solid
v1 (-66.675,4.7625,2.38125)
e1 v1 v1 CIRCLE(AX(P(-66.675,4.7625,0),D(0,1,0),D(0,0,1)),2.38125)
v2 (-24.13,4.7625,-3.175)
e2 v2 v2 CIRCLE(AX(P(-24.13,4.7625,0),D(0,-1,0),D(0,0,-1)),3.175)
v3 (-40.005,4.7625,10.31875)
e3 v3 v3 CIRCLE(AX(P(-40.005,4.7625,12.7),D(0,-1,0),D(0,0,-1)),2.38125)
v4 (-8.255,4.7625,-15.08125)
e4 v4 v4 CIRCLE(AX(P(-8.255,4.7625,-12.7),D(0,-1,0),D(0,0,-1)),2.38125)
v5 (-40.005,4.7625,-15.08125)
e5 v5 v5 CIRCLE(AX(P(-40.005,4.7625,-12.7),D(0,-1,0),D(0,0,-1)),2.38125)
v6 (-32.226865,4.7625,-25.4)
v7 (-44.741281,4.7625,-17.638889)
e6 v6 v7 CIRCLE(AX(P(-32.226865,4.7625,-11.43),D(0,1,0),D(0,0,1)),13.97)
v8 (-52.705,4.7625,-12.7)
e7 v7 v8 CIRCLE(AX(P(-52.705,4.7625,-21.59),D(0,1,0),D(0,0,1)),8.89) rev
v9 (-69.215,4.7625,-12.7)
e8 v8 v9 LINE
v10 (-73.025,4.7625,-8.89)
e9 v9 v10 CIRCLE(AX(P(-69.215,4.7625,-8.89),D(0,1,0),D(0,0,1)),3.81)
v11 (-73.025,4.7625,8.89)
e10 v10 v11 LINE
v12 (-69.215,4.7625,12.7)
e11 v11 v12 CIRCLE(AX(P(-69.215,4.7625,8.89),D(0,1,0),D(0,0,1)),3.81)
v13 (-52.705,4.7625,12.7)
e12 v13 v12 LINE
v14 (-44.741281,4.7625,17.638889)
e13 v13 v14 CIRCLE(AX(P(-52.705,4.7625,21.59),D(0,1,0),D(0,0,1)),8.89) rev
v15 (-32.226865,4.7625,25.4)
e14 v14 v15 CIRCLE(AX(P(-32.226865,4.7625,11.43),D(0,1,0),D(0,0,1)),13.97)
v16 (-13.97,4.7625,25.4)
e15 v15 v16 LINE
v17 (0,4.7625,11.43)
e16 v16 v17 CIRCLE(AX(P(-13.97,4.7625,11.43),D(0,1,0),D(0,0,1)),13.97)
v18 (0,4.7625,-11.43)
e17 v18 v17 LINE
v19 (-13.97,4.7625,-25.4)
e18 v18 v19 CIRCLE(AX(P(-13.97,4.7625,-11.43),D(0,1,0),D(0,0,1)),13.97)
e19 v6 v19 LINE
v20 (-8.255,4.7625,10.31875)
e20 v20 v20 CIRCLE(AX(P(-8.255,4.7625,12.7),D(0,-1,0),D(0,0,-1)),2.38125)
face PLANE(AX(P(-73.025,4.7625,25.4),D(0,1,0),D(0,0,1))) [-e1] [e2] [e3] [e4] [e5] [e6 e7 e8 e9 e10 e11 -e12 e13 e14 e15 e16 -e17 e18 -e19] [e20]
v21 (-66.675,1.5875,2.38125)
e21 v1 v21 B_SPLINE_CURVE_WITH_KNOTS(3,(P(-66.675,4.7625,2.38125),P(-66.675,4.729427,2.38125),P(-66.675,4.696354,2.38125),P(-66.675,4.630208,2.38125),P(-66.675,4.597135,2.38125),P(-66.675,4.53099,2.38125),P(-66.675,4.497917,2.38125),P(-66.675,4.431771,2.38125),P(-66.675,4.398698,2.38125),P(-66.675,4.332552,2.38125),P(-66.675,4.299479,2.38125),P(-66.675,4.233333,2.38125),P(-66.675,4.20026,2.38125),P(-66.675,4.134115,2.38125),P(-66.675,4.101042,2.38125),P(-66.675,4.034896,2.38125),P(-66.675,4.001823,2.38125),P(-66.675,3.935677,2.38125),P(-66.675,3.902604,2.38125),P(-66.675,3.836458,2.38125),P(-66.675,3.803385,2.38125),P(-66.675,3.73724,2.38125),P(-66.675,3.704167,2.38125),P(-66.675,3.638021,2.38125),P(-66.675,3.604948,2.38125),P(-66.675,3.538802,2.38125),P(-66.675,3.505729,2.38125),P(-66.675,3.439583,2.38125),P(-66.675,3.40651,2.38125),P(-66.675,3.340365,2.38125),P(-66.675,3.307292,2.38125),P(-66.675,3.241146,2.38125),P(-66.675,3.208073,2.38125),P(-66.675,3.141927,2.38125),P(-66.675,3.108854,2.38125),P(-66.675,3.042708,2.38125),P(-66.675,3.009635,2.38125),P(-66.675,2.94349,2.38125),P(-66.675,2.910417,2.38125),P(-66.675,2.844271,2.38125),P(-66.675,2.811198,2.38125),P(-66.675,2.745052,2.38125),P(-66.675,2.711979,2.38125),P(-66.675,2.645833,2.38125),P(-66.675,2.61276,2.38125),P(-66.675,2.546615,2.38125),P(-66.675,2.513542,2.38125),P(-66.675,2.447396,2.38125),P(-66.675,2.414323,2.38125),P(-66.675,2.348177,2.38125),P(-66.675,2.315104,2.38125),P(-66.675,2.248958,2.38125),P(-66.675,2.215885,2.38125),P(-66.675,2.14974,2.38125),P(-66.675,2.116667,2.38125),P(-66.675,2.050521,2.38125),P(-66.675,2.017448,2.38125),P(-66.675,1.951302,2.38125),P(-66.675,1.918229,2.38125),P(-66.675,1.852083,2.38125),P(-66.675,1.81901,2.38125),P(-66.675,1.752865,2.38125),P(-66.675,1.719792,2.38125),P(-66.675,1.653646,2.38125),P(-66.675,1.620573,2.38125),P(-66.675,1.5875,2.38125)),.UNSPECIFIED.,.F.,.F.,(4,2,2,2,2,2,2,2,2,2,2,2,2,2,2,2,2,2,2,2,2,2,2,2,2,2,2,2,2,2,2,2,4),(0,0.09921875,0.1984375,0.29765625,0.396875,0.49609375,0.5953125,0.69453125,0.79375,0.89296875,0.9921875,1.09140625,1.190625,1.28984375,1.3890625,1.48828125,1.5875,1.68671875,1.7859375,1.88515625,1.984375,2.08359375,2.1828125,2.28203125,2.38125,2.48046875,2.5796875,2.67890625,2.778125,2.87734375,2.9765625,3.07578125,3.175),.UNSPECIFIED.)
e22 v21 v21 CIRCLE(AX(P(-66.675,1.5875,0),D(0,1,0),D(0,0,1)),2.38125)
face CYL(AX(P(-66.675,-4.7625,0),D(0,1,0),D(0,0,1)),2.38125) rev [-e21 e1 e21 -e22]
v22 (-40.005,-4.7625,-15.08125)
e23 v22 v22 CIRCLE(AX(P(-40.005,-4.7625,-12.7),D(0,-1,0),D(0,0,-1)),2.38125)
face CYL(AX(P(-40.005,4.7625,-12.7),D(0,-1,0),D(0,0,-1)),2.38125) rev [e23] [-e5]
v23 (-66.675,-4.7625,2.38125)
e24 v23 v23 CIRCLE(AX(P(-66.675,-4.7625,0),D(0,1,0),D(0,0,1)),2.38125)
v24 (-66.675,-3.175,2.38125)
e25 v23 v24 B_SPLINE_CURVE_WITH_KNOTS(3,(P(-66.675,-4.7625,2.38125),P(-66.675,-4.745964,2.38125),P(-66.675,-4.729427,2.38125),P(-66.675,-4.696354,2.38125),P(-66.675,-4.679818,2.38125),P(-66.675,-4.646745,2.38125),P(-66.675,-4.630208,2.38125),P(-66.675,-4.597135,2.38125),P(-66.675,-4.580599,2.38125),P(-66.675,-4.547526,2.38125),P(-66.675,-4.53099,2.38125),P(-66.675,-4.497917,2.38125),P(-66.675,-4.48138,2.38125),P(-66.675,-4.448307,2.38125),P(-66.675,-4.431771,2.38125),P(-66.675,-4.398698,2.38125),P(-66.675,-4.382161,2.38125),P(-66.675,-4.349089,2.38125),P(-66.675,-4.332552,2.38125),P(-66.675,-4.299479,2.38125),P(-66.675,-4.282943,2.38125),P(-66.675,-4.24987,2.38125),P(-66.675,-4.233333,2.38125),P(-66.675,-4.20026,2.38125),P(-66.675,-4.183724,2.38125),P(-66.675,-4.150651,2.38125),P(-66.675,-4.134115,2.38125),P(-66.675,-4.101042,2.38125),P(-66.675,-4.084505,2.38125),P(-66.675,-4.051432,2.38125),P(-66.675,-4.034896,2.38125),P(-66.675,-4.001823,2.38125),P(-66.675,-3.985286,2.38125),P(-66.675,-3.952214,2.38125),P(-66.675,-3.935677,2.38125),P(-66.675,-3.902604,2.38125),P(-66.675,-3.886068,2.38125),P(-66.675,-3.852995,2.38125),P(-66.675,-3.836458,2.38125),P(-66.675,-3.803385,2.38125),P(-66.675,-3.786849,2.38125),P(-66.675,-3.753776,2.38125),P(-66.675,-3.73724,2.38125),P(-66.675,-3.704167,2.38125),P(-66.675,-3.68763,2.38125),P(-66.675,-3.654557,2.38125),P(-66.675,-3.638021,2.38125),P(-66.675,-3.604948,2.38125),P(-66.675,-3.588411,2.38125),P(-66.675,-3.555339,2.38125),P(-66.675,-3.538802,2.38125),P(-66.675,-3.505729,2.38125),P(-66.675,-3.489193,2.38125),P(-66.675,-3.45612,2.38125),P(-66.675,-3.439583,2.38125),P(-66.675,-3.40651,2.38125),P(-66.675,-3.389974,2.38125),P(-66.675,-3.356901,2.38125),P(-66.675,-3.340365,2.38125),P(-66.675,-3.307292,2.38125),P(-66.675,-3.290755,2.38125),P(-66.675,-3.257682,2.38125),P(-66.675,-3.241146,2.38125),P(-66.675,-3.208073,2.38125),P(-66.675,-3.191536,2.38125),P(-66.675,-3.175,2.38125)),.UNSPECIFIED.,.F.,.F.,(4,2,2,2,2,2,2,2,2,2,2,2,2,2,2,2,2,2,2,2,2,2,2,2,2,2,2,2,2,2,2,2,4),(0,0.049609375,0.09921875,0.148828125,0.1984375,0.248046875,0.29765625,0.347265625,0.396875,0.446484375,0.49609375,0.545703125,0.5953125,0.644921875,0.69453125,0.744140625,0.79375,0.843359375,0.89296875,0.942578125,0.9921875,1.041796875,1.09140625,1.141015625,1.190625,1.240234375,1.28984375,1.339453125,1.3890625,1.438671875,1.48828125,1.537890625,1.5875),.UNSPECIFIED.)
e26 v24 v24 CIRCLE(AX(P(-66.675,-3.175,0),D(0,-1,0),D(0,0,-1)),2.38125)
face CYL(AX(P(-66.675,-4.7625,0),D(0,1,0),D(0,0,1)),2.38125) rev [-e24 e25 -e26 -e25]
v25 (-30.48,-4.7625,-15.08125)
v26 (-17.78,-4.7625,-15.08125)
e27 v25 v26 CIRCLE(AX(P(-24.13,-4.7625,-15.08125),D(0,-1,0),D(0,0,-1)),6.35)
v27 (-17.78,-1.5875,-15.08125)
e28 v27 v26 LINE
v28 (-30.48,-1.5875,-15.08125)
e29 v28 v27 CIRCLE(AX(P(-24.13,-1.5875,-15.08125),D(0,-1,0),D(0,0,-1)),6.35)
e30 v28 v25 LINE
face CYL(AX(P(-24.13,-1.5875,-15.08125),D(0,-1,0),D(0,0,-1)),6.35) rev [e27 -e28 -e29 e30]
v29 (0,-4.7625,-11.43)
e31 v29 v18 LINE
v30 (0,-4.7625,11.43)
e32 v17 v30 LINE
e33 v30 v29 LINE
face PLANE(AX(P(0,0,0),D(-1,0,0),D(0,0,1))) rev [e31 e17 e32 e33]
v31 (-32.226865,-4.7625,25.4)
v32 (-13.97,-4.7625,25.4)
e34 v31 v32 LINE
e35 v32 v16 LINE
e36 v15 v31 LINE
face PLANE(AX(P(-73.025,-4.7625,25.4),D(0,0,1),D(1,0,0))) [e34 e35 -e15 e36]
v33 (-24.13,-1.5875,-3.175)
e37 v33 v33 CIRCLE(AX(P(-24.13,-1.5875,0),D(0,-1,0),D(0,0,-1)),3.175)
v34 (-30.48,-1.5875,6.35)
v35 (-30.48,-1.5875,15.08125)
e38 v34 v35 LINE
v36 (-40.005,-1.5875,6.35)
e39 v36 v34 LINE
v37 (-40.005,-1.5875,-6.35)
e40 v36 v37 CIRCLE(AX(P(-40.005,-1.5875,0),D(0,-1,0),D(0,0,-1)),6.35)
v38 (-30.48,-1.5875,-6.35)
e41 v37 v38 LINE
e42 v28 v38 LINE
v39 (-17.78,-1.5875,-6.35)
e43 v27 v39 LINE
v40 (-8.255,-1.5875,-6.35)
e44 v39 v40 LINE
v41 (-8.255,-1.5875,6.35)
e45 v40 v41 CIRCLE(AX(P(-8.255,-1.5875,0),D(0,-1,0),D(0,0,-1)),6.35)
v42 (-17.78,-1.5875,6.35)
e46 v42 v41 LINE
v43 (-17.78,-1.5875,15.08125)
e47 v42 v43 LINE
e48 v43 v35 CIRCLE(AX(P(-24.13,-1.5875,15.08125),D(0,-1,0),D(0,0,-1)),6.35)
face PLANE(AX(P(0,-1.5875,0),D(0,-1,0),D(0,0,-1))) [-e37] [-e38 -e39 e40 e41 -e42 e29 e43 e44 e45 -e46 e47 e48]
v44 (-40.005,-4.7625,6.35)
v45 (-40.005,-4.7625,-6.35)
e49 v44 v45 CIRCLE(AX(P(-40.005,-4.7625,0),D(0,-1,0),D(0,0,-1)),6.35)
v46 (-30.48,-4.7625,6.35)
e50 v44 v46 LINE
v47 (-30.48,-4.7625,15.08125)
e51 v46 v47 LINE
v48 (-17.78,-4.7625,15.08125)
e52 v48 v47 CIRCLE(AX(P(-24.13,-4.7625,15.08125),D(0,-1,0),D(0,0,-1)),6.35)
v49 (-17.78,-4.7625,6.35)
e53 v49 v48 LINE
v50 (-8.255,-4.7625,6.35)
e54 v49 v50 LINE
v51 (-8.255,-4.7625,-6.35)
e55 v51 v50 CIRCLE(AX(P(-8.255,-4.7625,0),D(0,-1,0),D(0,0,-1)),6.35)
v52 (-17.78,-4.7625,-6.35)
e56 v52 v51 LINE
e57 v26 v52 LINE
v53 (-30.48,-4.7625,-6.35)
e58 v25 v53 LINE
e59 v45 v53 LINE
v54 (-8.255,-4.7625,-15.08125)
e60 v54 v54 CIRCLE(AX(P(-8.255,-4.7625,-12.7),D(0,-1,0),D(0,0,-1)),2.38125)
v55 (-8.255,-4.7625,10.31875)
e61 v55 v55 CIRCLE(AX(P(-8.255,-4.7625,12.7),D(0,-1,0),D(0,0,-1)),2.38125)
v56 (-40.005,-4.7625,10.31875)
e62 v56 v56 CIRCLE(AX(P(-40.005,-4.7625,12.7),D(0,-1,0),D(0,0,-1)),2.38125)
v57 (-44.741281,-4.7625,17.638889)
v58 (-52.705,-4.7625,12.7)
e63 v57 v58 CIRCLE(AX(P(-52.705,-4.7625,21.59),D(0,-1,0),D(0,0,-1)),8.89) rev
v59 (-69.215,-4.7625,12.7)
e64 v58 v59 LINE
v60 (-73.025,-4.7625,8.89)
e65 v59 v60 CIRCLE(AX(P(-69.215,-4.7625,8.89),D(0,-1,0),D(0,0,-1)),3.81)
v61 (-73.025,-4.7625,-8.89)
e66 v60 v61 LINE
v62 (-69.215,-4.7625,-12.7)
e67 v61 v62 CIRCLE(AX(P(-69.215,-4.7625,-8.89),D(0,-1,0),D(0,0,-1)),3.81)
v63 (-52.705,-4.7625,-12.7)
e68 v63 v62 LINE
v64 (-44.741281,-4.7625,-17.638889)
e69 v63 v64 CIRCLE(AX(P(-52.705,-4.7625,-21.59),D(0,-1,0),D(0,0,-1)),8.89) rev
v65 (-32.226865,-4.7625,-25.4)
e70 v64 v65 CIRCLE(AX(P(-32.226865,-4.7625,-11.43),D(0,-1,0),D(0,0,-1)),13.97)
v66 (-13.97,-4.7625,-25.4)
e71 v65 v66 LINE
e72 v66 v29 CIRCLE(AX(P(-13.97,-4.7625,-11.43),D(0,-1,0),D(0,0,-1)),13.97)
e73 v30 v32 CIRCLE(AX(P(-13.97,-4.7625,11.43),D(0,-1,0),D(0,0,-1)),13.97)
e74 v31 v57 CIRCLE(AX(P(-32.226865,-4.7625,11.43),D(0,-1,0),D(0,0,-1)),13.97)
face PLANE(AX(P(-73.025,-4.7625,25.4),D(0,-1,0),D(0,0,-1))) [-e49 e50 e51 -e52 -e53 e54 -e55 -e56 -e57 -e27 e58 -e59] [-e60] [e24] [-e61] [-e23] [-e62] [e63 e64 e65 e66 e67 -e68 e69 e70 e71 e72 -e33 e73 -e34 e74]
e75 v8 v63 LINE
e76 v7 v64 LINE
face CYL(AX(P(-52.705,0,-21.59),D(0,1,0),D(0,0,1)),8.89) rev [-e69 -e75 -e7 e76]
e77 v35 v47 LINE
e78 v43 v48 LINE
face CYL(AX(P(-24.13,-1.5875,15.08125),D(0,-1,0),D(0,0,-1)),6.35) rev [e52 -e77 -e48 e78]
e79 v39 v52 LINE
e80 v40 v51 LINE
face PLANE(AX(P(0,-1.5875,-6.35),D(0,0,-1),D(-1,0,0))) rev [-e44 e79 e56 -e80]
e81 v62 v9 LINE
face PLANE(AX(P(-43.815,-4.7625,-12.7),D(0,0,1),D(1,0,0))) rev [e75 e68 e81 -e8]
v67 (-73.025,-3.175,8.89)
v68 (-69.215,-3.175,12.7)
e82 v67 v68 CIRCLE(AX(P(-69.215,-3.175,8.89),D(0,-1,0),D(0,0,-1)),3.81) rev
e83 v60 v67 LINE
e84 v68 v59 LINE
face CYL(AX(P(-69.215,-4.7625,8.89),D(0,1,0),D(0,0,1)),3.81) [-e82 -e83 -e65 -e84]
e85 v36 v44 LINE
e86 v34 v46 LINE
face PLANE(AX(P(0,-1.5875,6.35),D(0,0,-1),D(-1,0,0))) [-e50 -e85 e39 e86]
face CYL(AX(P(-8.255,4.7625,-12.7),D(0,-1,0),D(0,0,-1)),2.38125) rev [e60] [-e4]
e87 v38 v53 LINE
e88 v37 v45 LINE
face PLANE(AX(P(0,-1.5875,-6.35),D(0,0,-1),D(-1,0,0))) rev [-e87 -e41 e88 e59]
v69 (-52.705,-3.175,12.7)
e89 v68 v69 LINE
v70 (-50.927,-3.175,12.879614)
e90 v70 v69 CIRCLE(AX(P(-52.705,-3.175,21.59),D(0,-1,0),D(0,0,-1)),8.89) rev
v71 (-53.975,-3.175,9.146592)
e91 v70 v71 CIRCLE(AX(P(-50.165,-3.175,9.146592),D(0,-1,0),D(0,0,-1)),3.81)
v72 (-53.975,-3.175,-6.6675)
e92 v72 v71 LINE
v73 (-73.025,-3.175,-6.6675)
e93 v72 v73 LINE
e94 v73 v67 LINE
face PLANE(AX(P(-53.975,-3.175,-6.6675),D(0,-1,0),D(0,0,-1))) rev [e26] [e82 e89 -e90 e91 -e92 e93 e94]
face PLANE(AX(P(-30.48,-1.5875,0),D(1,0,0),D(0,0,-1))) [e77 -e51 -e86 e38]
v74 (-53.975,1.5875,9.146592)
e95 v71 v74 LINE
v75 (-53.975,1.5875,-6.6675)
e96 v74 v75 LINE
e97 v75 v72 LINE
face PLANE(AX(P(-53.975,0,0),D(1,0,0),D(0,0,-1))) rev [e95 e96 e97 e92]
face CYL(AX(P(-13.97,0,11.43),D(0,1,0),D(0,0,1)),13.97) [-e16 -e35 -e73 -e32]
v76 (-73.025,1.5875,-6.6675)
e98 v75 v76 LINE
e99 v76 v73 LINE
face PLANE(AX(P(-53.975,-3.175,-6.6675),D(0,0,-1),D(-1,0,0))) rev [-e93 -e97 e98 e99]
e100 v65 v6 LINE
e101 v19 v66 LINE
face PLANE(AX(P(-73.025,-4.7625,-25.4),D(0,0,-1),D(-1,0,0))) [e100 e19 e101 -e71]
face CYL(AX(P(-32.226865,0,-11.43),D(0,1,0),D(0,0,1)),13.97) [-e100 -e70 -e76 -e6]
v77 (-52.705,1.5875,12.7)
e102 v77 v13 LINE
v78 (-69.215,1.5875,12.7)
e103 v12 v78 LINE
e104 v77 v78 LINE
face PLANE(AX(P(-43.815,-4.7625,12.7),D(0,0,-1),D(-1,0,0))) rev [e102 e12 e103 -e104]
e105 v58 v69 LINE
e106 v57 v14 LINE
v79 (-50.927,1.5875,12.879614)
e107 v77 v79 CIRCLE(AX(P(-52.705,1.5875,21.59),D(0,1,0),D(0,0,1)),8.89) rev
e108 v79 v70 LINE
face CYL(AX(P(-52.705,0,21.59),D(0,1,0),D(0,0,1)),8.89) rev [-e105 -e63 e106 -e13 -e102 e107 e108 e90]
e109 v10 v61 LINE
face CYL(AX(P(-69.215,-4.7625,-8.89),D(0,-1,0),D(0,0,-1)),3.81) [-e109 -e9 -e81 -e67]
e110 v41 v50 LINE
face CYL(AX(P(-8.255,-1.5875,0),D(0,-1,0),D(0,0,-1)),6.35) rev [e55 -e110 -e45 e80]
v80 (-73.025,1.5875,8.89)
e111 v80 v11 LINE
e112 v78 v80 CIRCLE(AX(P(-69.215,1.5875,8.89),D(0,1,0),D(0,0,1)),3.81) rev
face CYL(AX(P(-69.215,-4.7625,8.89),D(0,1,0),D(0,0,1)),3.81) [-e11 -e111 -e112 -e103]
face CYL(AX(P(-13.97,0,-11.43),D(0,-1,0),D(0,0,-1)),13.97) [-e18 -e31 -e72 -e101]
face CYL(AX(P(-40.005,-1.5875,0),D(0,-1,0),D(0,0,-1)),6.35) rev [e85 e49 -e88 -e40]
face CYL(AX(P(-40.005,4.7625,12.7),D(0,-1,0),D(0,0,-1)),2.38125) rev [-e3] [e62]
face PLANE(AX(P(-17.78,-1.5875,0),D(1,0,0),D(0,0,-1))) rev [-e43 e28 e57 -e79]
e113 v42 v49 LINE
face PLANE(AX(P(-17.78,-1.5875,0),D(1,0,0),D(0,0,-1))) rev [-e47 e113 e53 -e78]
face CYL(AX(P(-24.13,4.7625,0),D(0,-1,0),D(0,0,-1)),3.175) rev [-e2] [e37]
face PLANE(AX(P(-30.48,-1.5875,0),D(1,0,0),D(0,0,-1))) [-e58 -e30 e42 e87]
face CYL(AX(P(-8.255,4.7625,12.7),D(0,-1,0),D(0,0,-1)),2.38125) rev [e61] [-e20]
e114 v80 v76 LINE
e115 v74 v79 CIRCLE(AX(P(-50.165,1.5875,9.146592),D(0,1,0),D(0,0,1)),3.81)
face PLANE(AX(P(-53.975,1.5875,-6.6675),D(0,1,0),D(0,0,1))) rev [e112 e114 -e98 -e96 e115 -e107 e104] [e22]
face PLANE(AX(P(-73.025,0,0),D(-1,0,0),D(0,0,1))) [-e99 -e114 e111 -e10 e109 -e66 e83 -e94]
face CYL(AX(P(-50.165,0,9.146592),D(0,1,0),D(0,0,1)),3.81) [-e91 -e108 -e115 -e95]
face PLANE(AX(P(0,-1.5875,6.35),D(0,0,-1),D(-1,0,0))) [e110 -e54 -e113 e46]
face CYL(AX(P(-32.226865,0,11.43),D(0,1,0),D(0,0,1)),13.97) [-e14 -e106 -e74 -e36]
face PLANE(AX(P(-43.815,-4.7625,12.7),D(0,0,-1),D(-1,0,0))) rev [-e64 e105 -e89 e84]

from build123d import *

# Parameters (mm, degrees)
SKETCH1_W           = 50.8
SKETCH1_H           = 9.525
BOSS_EXTRUDE1_DEPTH = 73.025
CUT_EXTRUDE2_DEPTH  = 19.05
SKETCH4_R           = 2.38125
CUT_EXTRUDE3_DEPTH  = 78.90081033
SKETCH5_W           = 12.7
SKETCH5_H           = 9.525
CUT_EXTRUDE4_DEPTH  = 29.21
FILLET2_R           = 8.89
FILLET3_R           = 3.81
FILLET4_R           = 13.97
FILLET5_R           = 13.97
CUT_EXTRUDE10_DEPTH = 3.175
SKETCH14_R          = 3.175
CUT_EXTRUDE11_DEPTH = 78.576627575
SKETCH17_R          = 2.38125
CUT_EXTRUDE12_DEPTH = 78.900810468
SKETCH19_W          = 19.05
SKETCH19_H          = 4.7625
CUT_EXTRUDE14_DEPTH = 6.0325
FILLET8_R           = 3.81
FILLET9_R           = 3.81


with BuildPart() as part:
    # Sketch1 → Boss-Extrude1 (new body)
    with BuildSketch(Plane(origin=(0, 0, 0), x_dir=(0, 0, -1), z_dir=(1, 0, 0))):
        Rectangle(SKETCH1_W, SKETCH1_H)
    extrude(amount=-BOSS_EXTRUDE1_DEPTH)

    # Sketch3 → Cut-Extrude2 (cut)
    with BuildSketch(Plane.ZY.offset(73.025)):
        Polygon((-6.6675, -3.175), (6.6675, -3.175), (6.6675, -0.79375), (6.6675, 1.5875), (-6.6675, 1.5875), (-6.6675, -0.79375), align=None)
    extrude(amount=-CUT_EXTRUDE2_DEPTH, mode=Mode.SUBTRACT)

    # Sketch4 → Cut-Extrude3 (cut, through all)
    with BuildSketch(Plane(origin=(0, 4.7625, 0), x_dir=(1, 0, 0), z_dir=(0, 1, 0))):
        with Locations(Location((-66.675, 0, 0), (0, 0, 270))):
            Circle(SKETCH4_R)
    extrude(amount=-CUT_EXTRUDE3_DEPTH, mode=Mode.SUBTRACT)

    # Sketch5 → Cut-Extrude4 (cut)
    with BuildSketch(Plane.ZY.offset(73.025)):
        with Locations((-19.05, 0)):
            Rectangle(SKETCH5_W, SKETCH5_H)
        with Locations((19.05, 0)):
            Rectangle(SKETCH5_W, SKETCH5_H)
    extrude(amount=-CUT_EXTRUDE4_DEPTH, mode=Mode.SUBTRACT)

    # Fillet2
    fillet2_edges = [part.edges().sort_by_distance(p)[0] for p in [
        (-43.815, 0, -12.7),
        (-43.815, 0, 12.7),
    ]]
    fillet(fillet2_edges, radius=FILLET2_R)

    # Fillet3
    fillet3_edges = [part.edges().sort_by_distance(p)[0] for p in [
        (-73.025, 0, -12.7),
    ]]
    fillet(fillet3_edges, radius=FILLET3_R)

    # Fillet4
    fillet4_edges = [part.edges().sort_by_distance(p)[0] for p in [
        (-43.815, 0, 25.4),
        (-43.815, 0, -25.4),
    ]]
    fillet(fillet4_edges, radius=FILLET4_R)

    # Fillet5
    fillet5_edges = [part.edges().sort_by_distance(p)[0] for p in [
        (0, 0, 25.4),
        (0, 0, -25.4),
    ]]
    fillet(fillet5_edges, radius=FILLET5_R)

    # Sketch13 → Cut-Extrude10 (cut)
    with BuildSketch(Plane.XZ.offset(4.7625)):
        with BuildLine():
            Line((-30.48, 6.35), (-30.48, 15.08125))
            ThreePointArc((-30.48, 15.08125), (-24.13, 21.43125), (-17.78, 15.08125))
            Line((-17.78, 15.08125), (-17.78, 6.35))
            Line((-17.78, 6.35), (-8.255, 6.35))
            ThreePointArc((-8.255, 6.35), (-1.905, 0), (-8.255, -6.35))
            Line((-8.255, -6.35), (-17.78, -6.35))
            Line((-17.78, -6.35), (-17.78, -15.08125))
            ThreePointArc((-17.78, -15.08125), (-24.13, -21.43125), (-30.48, -15.08125))
            Line((-30.48, -15.08125), (-30.48, -6.35))
            Line((-30.48, -6.35), (-40.005, -6.35))
            ThreePointArc((-40.005, -6.35), (-46.355, 0), (-40.005, 6.35))
            Line((-40.005, 6.35), (-30.48, 6.35))
        make_face()
    extrude(amount=-CUT_EXTRUDE10_DEPTH, mode=Mode.SUBTRACT)

    # Sketch14 → Cut-Extrude11 (cut, through all)
    with BuildSketch(Plane.XZ.offset(1.5875)):
        with Locations(Location((-24.13, 0, 0), (0, 0, 270))):
            Circle(SKETCH14_R)
    extrude(amount=-CUT_EXTRUDE11_DEPTH, mode=Mode.SUBTRACT)

    # Sketch17 → Cut-Extrude12 (cut, through all)
    with BuildSketch(Plane(origin=(0, -4.7625, 0), x_dir=(-1, 0, 0), z_dir=(0, -1, 0))):
        with Locations(Location((40.005, -12.7, 0), (0, 0, 90))):
            Circle(SKETCH17_R)
        with Locations(Location((40.005, 12.7, 0), (0, 0, 90))):
            Circle(SKETCH17_R)
        with Locations(Location((8.255, -12.7, 0), (0, 0, 90))):
            Circle(SKETCH17_R)
        with Locations(Location((8.255, 12.7, 0), (0, 0, 90))):
            Circle(SKETCH17_R)
    extrude(amount=-CUT_EXTRUDE12_DEPTH, mode=Mode.SUBTRACT)

    # Sketch19 → Cut-Extrude14 (cut)
    with BuildSketch(Plane.XY.offset(12.7)):
        with Locations((-63.5, -0.79375)):
            Rectangle(SKETCH19_W, SKETCH19_H)
    extrude(amount=-CUT_EXTRUDE14_DEPTH, mode=Mode.SUBTRACT)

    # Fillet8
    # the kernel refuses this fillet: 3.81 mm, written as the material it takes off along each edge
    with BuildSketch(Plane(origin=(-53.975, 1.5875, 12.7), x_dir=(0, 0, -1), z_dir=(0, -1, 0))) as fillet8_piece_1:
        with BuildLine():
            CenterArc((3.553407893, 3.81), FILLET8_R, 191.536959033, 78.463040967)
            Line((-0.179614475, 3.048), (-0.552916711, 2.9718))
            ThreePointArc((-0.552916711, 2.9718), (-0.381, 1.27), (-0.381, 0))
            Line((-0.381, 0), (0, -0.381))
            Line((0, -0.381), (3.553407893, -0.381))
            Line((3.553407893, -0.381), (3.553407893, 0))
        make_face()
    extrude(amount=4.7625, mode=Mode.SUBTRACT)

    # Fillet9
    fillet9_edges = [part.edges().sort_by_distance(p)[0] for p in [
        (-73.025, -3.96875, 12.7),
        (-73.025, 3.175, 12.7),
    ]]
    fillet(fillet9_edges, radius=FILLET9_R)


solid = part.part
